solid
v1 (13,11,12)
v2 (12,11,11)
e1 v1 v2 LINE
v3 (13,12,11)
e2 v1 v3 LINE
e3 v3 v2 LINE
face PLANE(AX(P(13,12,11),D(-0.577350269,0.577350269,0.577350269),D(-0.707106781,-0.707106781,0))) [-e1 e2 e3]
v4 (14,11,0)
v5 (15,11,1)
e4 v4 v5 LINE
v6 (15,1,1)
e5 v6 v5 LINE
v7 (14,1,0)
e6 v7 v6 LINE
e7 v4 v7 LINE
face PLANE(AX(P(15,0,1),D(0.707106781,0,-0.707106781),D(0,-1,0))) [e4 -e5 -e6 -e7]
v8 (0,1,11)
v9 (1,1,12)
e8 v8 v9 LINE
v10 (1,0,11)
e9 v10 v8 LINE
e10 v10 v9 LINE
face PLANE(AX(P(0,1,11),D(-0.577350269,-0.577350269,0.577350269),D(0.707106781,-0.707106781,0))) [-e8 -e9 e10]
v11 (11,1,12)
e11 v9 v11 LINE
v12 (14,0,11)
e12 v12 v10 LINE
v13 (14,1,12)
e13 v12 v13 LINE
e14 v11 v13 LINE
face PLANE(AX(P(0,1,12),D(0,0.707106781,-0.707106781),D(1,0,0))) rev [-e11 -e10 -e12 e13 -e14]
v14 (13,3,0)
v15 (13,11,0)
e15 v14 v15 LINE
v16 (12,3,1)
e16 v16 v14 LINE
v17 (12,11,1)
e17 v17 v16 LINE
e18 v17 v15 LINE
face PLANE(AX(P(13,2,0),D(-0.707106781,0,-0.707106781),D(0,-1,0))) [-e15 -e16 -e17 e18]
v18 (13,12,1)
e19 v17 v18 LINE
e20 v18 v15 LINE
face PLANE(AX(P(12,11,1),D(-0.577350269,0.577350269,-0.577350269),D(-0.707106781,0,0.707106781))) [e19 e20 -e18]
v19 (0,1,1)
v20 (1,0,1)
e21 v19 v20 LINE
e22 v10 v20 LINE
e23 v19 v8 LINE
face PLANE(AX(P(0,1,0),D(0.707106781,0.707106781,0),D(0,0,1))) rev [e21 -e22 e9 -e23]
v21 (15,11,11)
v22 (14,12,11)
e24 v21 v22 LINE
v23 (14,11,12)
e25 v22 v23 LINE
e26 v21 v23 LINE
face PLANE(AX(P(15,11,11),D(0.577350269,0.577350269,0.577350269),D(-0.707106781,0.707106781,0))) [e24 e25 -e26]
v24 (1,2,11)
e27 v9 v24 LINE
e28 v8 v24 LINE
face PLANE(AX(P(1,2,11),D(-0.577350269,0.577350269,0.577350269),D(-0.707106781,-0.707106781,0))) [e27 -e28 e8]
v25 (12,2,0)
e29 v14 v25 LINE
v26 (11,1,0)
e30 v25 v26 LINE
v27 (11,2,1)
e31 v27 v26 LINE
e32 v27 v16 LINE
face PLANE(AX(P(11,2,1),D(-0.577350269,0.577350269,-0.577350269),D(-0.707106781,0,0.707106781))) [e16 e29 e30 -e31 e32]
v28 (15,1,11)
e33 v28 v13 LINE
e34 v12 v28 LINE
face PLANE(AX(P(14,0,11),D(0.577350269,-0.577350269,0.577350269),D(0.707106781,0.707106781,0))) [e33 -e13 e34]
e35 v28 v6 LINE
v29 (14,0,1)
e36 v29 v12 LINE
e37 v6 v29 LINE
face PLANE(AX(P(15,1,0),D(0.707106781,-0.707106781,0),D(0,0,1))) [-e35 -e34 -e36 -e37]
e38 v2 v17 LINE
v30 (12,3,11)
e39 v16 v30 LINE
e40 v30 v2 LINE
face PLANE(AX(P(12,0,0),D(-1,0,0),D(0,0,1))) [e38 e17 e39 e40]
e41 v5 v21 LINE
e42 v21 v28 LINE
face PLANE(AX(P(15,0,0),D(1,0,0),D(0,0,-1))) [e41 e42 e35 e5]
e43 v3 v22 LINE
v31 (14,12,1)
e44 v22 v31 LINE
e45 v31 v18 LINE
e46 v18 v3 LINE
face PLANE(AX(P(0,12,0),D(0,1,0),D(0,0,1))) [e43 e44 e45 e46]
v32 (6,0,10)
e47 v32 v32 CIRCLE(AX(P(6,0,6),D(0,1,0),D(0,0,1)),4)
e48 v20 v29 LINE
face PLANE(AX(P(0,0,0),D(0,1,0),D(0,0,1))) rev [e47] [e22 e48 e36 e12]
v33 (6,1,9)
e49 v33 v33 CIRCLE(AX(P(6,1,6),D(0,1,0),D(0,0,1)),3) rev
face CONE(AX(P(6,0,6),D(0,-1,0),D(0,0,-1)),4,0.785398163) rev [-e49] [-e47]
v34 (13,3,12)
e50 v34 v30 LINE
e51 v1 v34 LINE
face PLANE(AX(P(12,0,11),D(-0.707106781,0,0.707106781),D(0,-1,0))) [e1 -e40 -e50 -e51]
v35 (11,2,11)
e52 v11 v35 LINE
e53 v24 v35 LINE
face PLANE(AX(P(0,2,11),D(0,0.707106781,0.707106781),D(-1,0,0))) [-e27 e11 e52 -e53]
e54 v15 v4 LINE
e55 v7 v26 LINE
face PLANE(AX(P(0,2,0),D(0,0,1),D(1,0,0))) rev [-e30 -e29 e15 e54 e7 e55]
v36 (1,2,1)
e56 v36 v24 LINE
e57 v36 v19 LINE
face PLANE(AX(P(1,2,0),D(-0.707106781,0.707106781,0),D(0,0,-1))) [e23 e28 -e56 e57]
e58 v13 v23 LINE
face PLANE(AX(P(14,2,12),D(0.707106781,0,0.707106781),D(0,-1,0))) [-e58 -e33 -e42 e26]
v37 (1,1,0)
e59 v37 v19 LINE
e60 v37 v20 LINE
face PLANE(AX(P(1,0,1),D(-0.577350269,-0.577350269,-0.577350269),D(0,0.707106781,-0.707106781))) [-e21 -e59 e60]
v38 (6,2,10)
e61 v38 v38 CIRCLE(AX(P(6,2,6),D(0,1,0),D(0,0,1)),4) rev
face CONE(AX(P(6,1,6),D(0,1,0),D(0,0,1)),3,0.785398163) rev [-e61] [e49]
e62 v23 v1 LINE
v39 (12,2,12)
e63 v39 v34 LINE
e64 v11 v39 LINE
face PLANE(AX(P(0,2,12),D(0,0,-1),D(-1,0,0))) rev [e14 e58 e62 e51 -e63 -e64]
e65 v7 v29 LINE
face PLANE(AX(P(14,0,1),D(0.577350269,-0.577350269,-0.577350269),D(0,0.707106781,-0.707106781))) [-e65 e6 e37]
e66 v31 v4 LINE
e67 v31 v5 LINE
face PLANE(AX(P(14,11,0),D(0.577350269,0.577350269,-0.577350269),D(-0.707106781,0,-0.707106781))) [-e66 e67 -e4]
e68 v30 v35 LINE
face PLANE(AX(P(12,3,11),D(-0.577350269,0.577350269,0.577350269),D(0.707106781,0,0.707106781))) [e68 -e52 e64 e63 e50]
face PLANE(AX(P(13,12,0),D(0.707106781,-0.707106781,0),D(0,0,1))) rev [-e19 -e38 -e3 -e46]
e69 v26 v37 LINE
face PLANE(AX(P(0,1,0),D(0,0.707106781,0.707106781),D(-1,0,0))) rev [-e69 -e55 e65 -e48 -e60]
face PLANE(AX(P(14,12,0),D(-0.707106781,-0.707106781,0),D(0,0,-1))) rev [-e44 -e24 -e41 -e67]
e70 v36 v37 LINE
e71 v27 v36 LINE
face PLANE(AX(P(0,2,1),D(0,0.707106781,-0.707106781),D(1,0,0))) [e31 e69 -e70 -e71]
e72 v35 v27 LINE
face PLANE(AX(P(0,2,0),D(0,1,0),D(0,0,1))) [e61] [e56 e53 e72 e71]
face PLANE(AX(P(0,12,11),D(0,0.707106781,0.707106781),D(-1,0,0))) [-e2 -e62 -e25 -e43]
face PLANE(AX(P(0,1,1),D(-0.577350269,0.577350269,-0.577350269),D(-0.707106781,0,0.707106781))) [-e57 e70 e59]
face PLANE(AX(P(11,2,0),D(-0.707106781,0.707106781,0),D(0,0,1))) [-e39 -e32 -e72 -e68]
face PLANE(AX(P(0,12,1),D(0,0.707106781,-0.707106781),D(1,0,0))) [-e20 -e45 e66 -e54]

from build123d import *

# Parameters (mm, degrees)
SKETCH_1_W           = 12
SKETCH_1_H           = 12
SKETCH_1_R           = 3
EXTRUDE_1_DEPTH      = 2
EXTRUDE_2_DEPTH      = 10
EXTRUDE_2_DEPTH_BACK = 2
SKETCH_2_W           = 3
SKETCH_2_H           = 12
CHAMFER_1_SIZE       = 1


with BuildPart() as part:
    # 草图1 → 凸台-拉伸1 (new body)
    with BuildSketch(Plane(origin=(0, 0, 0), x_dir=(1, 0, 0), z_dir=(0, 1, 0))):
        with Locations((6, -6)):
            Rectangle(SKETCH_1_W, SKETCH_1_H)
        with Locations(Location((6, -6, 0), (0, 0, 270))):
            Circle(SKETCH_1_R, mode=Mode.SUBTRACT)
    extrude(amount=EXTRUDE_1_DEPTH)

    # 草图2 → 凸台-拉伸2 (add, two sides: drawn at the far end of the back side and taken through both)
    with BuildSketch(Plane(origin=(0, 2, 0), x_dir=(1, 0, 0), z_dir=(0, 1, 0)).offset(-EXTRUDE_2_DEPTH_BACK)):
        with Locations((13.5, -6)):
            Rectangle(SKETCH_2_W, SKETCH_2_H)
    extrude(amount=EXTRUDE_2_DEPTH + EXTRUDE_2_DEPTH_BACK)

    # 倒角1
    chamfer_1_edges = [part.edges().sort_by_distance(p)[0] for p in [
        (6, 0, 3),
        (6, 2, 3),
        (12, 2, 6),
        (6, 2, 0),
        (12, 7, 12),
        (12, 7, 0),
        (15, 6, 0),
        (15, 0, 6),
        (15, 6, 12),
        (12, 12, 6),
        (13.5, 12, 12),
        (15, 12, 6),
        (13.5, 12, 0),
        (0, 2, 6),
        (7.5, 0, 0),
        (7.5, 0, 12),
        (0, 0, 6),
        (0, 1, 0),
        (0, 1, 12),
        (6, 2, 12),
    ]]
    chamfer(chamfer_1_edges, length=CHAMFER_1_SIZE - 0.0001)  # a hair under: the kernel refuses the full size


solid = part.part
